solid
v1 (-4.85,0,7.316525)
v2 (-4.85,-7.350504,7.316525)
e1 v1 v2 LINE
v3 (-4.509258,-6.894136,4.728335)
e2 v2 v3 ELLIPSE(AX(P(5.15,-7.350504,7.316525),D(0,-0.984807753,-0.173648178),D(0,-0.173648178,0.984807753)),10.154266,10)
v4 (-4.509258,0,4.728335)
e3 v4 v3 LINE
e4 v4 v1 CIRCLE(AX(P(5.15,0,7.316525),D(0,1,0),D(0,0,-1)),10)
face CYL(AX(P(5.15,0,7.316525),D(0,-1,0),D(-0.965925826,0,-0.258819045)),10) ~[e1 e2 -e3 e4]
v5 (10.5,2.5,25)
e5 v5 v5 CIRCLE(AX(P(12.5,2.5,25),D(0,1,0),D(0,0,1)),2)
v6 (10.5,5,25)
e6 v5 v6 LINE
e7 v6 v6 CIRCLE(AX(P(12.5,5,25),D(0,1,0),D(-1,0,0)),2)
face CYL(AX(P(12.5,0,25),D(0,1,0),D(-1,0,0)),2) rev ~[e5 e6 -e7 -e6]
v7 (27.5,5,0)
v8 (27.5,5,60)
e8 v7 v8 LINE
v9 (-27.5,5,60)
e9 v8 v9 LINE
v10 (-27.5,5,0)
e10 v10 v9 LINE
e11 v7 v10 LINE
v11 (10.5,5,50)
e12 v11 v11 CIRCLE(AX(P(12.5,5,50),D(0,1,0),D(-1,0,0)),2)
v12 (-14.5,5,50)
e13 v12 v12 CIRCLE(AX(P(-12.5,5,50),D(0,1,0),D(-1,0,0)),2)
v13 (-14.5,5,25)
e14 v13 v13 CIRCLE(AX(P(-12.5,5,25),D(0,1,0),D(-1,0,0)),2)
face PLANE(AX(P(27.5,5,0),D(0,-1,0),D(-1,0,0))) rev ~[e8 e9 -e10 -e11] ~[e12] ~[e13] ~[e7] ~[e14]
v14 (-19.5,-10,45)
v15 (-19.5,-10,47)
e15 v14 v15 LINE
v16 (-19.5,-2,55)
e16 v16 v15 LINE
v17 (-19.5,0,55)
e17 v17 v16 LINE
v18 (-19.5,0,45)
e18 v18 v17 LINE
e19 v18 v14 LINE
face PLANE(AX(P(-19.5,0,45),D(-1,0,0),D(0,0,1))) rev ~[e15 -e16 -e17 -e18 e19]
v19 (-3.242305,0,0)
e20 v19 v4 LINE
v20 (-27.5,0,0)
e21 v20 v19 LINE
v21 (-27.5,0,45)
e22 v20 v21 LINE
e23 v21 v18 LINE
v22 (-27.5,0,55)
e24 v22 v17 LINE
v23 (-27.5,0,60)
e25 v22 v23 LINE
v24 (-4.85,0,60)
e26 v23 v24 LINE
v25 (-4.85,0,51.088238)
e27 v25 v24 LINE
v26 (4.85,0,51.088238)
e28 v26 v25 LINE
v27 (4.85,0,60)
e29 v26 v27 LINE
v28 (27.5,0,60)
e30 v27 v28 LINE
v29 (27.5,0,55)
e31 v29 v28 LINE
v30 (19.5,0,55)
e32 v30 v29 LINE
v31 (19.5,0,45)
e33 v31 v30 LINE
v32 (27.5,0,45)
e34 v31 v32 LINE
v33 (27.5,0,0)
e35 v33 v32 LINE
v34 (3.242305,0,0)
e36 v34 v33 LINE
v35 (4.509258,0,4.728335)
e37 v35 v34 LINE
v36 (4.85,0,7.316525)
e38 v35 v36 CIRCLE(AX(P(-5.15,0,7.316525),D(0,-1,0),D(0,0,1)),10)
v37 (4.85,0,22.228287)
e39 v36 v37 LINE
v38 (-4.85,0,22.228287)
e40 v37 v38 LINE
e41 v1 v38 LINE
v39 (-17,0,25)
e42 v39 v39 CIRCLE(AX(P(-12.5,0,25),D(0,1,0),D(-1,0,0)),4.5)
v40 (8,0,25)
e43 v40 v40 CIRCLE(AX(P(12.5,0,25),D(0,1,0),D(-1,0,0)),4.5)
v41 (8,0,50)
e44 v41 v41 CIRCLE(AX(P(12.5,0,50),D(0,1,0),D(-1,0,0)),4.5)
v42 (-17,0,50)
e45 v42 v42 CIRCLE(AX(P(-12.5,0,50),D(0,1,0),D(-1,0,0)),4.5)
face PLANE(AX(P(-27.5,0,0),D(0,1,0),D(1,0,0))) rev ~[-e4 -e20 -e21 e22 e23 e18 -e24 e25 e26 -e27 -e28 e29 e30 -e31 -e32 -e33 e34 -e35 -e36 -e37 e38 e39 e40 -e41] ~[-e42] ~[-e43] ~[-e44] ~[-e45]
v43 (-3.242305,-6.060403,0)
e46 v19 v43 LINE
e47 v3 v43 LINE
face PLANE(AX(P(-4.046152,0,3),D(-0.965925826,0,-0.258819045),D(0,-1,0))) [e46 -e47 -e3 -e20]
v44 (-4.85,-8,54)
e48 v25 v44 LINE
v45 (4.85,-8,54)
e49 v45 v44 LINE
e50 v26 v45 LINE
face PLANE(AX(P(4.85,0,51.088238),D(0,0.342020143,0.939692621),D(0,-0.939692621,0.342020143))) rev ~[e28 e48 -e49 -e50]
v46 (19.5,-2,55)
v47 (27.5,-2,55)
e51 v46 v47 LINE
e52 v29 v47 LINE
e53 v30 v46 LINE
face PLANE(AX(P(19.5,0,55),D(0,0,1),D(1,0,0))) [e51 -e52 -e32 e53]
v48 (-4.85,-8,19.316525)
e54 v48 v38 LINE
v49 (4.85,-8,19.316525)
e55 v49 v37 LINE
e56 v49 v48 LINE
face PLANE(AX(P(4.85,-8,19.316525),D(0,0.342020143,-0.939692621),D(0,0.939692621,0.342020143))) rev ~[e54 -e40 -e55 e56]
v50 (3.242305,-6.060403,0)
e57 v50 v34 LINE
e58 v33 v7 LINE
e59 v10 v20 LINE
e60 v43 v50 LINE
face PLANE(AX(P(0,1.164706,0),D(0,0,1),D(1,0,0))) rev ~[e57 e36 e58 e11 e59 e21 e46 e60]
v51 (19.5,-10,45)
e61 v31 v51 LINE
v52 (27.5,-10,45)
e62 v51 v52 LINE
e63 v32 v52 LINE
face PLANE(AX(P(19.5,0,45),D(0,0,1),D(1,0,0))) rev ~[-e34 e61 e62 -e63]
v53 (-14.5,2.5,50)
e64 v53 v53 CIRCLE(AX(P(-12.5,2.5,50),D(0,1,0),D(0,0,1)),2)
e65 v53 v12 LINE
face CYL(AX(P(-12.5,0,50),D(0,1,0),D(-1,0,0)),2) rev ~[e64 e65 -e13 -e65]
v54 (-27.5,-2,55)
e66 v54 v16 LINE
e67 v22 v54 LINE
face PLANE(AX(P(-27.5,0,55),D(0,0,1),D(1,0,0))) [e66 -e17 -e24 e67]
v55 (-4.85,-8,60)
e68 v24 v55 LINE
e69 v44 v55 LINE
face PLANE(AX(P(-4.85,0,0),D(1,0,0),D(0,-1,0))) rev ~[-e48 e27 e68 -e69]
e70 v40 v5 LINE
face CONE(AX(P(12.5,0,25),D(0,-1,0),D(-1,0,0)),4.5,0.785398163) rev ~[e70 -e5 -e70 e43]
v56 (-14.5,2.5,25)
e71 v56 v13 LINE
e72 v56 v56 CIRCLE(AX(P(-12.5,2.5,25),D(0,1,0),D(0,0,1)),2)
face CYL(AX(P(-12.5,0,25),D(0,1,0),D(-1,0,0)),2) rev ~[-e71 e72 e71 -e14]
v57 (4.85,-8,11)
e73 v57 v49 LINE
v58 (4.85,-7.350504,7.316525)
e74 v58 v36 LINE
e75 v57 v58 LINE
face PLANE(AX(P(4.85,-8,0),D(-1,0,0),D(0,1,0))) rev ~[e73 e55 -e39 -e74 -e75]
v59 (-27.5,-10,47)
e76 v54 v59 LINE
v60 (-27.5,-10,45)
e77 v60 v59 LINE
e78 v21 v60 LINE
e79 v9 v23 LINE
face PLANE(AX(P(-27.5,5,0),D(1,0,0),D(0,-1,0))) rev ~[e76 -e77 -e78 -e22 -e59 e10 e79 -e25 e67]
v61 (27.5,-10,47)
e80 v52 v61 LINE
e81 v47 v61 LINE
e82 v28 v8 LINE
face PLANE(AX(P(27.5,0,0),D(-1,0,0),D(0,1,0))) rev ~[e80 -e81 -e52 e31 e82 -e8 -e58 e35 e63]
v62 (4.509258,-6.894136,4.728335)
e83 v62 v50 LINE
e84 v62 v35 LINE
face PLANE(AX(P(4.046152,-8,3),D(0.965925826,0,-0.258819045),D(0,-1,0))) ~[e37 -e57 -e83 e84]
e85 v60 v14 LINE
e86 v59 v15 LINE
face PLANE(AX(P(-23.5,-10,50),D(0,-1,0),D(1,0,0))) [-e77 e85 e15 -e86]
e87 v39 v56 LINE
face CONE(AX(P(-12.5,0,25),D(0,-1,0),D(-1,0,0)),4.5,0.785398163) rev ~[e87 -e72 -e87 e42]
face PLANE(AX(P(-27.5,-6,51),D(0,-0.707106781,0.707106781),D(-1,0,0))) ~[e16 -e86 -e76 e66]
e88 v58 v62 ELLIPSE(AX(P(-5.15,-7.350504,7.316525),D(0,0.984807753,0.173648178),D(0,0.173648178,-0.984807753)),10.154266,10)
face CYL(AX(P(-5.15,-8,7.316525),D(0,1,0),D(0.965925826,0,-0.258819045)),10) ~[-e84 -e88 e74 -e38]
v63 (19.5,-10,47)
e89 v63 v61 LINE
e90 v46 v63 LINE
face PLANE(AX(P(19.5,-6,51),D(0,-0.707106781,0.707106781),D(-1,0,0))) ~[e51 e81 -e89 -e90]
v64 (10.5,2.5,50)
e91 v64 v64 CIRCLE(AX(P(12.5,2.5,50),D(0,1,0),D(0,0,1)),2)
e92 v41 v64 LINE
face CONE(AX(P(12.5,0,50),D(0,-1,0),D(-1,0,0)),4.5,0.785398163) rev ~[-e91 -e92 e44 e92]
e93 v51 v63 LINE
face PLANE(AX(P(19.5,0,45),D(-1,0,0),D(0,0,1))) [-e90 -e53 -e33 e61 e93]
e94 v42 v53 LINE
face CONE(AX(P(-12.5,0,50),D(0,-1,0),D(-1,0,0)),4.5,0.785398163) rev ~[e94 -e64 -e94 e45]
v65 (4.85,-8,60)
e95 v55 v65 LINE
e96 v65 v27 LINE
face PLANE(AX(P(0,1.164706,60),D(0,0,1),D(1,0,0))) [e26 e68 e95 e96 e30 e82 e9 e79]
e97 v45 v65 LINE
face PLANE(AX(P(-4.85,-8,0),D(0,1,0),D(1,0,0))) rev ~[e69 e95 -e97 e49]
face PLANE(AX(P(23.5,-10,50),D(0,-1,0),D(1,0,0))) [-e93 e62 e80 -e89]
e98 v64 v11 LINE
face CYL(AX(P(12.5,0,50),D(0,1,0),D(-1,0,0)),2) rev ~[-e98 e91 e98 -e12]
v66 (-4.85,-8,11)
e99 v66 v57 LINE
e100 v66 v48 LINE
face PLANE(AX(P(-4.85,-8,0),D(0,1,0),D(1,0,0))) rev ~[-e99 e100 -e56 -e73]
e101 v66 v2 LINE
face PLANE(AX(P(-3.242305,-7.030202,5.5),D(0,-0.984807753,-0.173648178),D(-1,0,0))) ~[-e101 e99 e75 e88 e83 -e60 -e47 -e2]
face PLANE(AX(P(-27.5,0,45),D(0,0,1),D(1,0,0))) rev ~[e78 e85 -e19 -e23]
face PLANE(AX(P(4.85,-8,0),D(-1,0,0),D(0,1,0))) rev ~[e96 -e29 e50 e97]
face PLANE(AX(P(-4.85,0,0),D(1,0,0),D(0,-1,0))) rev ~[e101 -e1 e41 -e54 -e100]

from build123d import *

# Parameters (mm, degrees)
F1_DEPTH       = 60
F3_D           = 4
F3_CSINK_D     = 9
F3_CSINK_ANGLE = 90
F4_C1_SIZE2    = 1.6076951546
F4_C1_SIZE     = 6
F4_C2_SIZE2    = 6
F4_C2_SIZE     = 1.6076951546
F6_R           = 10
F5_W           = 8
F5_H           = 10
F7_DEPTH       = 10
F8_SIZE        = 8
F10_DEPTH      = 9.7
F11_SIZE2      = 1.9395967878
F11_SIZE       = 11


# Not quite as in the source:
# - a feature names something its author has since deleted; it is built from what else it names


with BuildPart() as f1:
    # F0 (on Top) → F1 (new body)
    with BuildSketch(Plane.XY):
        Polygon((4.85, 0), (27.5, 0), (27.5, 5), (-27.5, 5), (-27.5, 0), (-4.85, 0), (-4.85, -8), (4.85, -8), align=None)
    extrude(amount=F1_DEPTH)

    # F3 (through all)
    with Locations(Plane.XZ):
        with Locations((-12.5, 50), (-12.5, 25), (12.5, 50), (12.5, 25)):
            CounterSinkHole(F3_D / 2, F3_CSINK_D / 2, counter_sink_angle=F3_CSINK_ANGLE)

    # F4: chamfer of 6 x 1.6076951546 on 2 edges, made by hand

    # F4_c1
    f4_c1_edges = [f1.edges().sort_by_distance(p)[0] for p in [
        (4.85, -4, 0),
    ]]
    f4_c1_side = f1.faces().sort_by_distance((4.85, -4, 0.0321539031))[0]
    chamfer(f4_c1_edges, length=F4_C1_SIZE, length2=F4_C1_SIZE2, reference=f4_c1_side)

    # F4_c2
    f4_c2_edges = [f1.edges().sort_by_distance(p)[0] for p in [
        (-4.85, -4, 0),
    ]]
    f4_c2_side = f1.faces().sort_by_distance((-4.8178460969, -4, 0))[0]
    chamfer(f4_c2_edges, length=F4_C2_SIZE, length2=F4_C2_SIZE2, reference=f4_c2_side)

    # F6
    f6_edges = [f1.edges().sort_by_distance(p)[0] for p in [
        (-4.85, -4, 6),
        (4.85, -4, 6),
    ]]
    fillet(f6_edges, radius=F6_R)

    # F5 (on face) → F7 (join)
    with BuildSketch(Plane.XZ):
        with Locations((-23.5, 50)):
            Rectangle(F5_W, F5_H)
        with Locations((23.5, 50)):
            Rectangle(F5_W, F5_H)
    extrude(amount=F7_DEPTH)

    # F8
    f8_edges = [f1.edges().sort_by_distance(p)[0] for p in [
        (-23.5, -10, 55),
        (23.5, -10, 55),
    ]]
    chamfer(f8_edges, length=F8_SIZE)

    # F9 (on face) → F10 (cut, through all)
    with BuildSketch(Plane.YZ.offset(4.85)):
        Polygon((0, 51.0882381259), (-8, 54), (-8, 19.3165249759), (0, 22.22828685), align=None)
    extrude(amount=-F10_DEPTH, mode=Mode.SUBTRACT)

    # F11
    f11_edges = [f1.edges().sort_by_distance(p)[0] for p in [
        (0, -8, 0),
    ]]
    f11_side = f1.faces().sort_by_distance((0, -8, 10.07737))[0]
    chamfer(f11_edges, length=F11_SIZE, length2=F11_SIZE2, reference=f11_side)


solid = f1.part
